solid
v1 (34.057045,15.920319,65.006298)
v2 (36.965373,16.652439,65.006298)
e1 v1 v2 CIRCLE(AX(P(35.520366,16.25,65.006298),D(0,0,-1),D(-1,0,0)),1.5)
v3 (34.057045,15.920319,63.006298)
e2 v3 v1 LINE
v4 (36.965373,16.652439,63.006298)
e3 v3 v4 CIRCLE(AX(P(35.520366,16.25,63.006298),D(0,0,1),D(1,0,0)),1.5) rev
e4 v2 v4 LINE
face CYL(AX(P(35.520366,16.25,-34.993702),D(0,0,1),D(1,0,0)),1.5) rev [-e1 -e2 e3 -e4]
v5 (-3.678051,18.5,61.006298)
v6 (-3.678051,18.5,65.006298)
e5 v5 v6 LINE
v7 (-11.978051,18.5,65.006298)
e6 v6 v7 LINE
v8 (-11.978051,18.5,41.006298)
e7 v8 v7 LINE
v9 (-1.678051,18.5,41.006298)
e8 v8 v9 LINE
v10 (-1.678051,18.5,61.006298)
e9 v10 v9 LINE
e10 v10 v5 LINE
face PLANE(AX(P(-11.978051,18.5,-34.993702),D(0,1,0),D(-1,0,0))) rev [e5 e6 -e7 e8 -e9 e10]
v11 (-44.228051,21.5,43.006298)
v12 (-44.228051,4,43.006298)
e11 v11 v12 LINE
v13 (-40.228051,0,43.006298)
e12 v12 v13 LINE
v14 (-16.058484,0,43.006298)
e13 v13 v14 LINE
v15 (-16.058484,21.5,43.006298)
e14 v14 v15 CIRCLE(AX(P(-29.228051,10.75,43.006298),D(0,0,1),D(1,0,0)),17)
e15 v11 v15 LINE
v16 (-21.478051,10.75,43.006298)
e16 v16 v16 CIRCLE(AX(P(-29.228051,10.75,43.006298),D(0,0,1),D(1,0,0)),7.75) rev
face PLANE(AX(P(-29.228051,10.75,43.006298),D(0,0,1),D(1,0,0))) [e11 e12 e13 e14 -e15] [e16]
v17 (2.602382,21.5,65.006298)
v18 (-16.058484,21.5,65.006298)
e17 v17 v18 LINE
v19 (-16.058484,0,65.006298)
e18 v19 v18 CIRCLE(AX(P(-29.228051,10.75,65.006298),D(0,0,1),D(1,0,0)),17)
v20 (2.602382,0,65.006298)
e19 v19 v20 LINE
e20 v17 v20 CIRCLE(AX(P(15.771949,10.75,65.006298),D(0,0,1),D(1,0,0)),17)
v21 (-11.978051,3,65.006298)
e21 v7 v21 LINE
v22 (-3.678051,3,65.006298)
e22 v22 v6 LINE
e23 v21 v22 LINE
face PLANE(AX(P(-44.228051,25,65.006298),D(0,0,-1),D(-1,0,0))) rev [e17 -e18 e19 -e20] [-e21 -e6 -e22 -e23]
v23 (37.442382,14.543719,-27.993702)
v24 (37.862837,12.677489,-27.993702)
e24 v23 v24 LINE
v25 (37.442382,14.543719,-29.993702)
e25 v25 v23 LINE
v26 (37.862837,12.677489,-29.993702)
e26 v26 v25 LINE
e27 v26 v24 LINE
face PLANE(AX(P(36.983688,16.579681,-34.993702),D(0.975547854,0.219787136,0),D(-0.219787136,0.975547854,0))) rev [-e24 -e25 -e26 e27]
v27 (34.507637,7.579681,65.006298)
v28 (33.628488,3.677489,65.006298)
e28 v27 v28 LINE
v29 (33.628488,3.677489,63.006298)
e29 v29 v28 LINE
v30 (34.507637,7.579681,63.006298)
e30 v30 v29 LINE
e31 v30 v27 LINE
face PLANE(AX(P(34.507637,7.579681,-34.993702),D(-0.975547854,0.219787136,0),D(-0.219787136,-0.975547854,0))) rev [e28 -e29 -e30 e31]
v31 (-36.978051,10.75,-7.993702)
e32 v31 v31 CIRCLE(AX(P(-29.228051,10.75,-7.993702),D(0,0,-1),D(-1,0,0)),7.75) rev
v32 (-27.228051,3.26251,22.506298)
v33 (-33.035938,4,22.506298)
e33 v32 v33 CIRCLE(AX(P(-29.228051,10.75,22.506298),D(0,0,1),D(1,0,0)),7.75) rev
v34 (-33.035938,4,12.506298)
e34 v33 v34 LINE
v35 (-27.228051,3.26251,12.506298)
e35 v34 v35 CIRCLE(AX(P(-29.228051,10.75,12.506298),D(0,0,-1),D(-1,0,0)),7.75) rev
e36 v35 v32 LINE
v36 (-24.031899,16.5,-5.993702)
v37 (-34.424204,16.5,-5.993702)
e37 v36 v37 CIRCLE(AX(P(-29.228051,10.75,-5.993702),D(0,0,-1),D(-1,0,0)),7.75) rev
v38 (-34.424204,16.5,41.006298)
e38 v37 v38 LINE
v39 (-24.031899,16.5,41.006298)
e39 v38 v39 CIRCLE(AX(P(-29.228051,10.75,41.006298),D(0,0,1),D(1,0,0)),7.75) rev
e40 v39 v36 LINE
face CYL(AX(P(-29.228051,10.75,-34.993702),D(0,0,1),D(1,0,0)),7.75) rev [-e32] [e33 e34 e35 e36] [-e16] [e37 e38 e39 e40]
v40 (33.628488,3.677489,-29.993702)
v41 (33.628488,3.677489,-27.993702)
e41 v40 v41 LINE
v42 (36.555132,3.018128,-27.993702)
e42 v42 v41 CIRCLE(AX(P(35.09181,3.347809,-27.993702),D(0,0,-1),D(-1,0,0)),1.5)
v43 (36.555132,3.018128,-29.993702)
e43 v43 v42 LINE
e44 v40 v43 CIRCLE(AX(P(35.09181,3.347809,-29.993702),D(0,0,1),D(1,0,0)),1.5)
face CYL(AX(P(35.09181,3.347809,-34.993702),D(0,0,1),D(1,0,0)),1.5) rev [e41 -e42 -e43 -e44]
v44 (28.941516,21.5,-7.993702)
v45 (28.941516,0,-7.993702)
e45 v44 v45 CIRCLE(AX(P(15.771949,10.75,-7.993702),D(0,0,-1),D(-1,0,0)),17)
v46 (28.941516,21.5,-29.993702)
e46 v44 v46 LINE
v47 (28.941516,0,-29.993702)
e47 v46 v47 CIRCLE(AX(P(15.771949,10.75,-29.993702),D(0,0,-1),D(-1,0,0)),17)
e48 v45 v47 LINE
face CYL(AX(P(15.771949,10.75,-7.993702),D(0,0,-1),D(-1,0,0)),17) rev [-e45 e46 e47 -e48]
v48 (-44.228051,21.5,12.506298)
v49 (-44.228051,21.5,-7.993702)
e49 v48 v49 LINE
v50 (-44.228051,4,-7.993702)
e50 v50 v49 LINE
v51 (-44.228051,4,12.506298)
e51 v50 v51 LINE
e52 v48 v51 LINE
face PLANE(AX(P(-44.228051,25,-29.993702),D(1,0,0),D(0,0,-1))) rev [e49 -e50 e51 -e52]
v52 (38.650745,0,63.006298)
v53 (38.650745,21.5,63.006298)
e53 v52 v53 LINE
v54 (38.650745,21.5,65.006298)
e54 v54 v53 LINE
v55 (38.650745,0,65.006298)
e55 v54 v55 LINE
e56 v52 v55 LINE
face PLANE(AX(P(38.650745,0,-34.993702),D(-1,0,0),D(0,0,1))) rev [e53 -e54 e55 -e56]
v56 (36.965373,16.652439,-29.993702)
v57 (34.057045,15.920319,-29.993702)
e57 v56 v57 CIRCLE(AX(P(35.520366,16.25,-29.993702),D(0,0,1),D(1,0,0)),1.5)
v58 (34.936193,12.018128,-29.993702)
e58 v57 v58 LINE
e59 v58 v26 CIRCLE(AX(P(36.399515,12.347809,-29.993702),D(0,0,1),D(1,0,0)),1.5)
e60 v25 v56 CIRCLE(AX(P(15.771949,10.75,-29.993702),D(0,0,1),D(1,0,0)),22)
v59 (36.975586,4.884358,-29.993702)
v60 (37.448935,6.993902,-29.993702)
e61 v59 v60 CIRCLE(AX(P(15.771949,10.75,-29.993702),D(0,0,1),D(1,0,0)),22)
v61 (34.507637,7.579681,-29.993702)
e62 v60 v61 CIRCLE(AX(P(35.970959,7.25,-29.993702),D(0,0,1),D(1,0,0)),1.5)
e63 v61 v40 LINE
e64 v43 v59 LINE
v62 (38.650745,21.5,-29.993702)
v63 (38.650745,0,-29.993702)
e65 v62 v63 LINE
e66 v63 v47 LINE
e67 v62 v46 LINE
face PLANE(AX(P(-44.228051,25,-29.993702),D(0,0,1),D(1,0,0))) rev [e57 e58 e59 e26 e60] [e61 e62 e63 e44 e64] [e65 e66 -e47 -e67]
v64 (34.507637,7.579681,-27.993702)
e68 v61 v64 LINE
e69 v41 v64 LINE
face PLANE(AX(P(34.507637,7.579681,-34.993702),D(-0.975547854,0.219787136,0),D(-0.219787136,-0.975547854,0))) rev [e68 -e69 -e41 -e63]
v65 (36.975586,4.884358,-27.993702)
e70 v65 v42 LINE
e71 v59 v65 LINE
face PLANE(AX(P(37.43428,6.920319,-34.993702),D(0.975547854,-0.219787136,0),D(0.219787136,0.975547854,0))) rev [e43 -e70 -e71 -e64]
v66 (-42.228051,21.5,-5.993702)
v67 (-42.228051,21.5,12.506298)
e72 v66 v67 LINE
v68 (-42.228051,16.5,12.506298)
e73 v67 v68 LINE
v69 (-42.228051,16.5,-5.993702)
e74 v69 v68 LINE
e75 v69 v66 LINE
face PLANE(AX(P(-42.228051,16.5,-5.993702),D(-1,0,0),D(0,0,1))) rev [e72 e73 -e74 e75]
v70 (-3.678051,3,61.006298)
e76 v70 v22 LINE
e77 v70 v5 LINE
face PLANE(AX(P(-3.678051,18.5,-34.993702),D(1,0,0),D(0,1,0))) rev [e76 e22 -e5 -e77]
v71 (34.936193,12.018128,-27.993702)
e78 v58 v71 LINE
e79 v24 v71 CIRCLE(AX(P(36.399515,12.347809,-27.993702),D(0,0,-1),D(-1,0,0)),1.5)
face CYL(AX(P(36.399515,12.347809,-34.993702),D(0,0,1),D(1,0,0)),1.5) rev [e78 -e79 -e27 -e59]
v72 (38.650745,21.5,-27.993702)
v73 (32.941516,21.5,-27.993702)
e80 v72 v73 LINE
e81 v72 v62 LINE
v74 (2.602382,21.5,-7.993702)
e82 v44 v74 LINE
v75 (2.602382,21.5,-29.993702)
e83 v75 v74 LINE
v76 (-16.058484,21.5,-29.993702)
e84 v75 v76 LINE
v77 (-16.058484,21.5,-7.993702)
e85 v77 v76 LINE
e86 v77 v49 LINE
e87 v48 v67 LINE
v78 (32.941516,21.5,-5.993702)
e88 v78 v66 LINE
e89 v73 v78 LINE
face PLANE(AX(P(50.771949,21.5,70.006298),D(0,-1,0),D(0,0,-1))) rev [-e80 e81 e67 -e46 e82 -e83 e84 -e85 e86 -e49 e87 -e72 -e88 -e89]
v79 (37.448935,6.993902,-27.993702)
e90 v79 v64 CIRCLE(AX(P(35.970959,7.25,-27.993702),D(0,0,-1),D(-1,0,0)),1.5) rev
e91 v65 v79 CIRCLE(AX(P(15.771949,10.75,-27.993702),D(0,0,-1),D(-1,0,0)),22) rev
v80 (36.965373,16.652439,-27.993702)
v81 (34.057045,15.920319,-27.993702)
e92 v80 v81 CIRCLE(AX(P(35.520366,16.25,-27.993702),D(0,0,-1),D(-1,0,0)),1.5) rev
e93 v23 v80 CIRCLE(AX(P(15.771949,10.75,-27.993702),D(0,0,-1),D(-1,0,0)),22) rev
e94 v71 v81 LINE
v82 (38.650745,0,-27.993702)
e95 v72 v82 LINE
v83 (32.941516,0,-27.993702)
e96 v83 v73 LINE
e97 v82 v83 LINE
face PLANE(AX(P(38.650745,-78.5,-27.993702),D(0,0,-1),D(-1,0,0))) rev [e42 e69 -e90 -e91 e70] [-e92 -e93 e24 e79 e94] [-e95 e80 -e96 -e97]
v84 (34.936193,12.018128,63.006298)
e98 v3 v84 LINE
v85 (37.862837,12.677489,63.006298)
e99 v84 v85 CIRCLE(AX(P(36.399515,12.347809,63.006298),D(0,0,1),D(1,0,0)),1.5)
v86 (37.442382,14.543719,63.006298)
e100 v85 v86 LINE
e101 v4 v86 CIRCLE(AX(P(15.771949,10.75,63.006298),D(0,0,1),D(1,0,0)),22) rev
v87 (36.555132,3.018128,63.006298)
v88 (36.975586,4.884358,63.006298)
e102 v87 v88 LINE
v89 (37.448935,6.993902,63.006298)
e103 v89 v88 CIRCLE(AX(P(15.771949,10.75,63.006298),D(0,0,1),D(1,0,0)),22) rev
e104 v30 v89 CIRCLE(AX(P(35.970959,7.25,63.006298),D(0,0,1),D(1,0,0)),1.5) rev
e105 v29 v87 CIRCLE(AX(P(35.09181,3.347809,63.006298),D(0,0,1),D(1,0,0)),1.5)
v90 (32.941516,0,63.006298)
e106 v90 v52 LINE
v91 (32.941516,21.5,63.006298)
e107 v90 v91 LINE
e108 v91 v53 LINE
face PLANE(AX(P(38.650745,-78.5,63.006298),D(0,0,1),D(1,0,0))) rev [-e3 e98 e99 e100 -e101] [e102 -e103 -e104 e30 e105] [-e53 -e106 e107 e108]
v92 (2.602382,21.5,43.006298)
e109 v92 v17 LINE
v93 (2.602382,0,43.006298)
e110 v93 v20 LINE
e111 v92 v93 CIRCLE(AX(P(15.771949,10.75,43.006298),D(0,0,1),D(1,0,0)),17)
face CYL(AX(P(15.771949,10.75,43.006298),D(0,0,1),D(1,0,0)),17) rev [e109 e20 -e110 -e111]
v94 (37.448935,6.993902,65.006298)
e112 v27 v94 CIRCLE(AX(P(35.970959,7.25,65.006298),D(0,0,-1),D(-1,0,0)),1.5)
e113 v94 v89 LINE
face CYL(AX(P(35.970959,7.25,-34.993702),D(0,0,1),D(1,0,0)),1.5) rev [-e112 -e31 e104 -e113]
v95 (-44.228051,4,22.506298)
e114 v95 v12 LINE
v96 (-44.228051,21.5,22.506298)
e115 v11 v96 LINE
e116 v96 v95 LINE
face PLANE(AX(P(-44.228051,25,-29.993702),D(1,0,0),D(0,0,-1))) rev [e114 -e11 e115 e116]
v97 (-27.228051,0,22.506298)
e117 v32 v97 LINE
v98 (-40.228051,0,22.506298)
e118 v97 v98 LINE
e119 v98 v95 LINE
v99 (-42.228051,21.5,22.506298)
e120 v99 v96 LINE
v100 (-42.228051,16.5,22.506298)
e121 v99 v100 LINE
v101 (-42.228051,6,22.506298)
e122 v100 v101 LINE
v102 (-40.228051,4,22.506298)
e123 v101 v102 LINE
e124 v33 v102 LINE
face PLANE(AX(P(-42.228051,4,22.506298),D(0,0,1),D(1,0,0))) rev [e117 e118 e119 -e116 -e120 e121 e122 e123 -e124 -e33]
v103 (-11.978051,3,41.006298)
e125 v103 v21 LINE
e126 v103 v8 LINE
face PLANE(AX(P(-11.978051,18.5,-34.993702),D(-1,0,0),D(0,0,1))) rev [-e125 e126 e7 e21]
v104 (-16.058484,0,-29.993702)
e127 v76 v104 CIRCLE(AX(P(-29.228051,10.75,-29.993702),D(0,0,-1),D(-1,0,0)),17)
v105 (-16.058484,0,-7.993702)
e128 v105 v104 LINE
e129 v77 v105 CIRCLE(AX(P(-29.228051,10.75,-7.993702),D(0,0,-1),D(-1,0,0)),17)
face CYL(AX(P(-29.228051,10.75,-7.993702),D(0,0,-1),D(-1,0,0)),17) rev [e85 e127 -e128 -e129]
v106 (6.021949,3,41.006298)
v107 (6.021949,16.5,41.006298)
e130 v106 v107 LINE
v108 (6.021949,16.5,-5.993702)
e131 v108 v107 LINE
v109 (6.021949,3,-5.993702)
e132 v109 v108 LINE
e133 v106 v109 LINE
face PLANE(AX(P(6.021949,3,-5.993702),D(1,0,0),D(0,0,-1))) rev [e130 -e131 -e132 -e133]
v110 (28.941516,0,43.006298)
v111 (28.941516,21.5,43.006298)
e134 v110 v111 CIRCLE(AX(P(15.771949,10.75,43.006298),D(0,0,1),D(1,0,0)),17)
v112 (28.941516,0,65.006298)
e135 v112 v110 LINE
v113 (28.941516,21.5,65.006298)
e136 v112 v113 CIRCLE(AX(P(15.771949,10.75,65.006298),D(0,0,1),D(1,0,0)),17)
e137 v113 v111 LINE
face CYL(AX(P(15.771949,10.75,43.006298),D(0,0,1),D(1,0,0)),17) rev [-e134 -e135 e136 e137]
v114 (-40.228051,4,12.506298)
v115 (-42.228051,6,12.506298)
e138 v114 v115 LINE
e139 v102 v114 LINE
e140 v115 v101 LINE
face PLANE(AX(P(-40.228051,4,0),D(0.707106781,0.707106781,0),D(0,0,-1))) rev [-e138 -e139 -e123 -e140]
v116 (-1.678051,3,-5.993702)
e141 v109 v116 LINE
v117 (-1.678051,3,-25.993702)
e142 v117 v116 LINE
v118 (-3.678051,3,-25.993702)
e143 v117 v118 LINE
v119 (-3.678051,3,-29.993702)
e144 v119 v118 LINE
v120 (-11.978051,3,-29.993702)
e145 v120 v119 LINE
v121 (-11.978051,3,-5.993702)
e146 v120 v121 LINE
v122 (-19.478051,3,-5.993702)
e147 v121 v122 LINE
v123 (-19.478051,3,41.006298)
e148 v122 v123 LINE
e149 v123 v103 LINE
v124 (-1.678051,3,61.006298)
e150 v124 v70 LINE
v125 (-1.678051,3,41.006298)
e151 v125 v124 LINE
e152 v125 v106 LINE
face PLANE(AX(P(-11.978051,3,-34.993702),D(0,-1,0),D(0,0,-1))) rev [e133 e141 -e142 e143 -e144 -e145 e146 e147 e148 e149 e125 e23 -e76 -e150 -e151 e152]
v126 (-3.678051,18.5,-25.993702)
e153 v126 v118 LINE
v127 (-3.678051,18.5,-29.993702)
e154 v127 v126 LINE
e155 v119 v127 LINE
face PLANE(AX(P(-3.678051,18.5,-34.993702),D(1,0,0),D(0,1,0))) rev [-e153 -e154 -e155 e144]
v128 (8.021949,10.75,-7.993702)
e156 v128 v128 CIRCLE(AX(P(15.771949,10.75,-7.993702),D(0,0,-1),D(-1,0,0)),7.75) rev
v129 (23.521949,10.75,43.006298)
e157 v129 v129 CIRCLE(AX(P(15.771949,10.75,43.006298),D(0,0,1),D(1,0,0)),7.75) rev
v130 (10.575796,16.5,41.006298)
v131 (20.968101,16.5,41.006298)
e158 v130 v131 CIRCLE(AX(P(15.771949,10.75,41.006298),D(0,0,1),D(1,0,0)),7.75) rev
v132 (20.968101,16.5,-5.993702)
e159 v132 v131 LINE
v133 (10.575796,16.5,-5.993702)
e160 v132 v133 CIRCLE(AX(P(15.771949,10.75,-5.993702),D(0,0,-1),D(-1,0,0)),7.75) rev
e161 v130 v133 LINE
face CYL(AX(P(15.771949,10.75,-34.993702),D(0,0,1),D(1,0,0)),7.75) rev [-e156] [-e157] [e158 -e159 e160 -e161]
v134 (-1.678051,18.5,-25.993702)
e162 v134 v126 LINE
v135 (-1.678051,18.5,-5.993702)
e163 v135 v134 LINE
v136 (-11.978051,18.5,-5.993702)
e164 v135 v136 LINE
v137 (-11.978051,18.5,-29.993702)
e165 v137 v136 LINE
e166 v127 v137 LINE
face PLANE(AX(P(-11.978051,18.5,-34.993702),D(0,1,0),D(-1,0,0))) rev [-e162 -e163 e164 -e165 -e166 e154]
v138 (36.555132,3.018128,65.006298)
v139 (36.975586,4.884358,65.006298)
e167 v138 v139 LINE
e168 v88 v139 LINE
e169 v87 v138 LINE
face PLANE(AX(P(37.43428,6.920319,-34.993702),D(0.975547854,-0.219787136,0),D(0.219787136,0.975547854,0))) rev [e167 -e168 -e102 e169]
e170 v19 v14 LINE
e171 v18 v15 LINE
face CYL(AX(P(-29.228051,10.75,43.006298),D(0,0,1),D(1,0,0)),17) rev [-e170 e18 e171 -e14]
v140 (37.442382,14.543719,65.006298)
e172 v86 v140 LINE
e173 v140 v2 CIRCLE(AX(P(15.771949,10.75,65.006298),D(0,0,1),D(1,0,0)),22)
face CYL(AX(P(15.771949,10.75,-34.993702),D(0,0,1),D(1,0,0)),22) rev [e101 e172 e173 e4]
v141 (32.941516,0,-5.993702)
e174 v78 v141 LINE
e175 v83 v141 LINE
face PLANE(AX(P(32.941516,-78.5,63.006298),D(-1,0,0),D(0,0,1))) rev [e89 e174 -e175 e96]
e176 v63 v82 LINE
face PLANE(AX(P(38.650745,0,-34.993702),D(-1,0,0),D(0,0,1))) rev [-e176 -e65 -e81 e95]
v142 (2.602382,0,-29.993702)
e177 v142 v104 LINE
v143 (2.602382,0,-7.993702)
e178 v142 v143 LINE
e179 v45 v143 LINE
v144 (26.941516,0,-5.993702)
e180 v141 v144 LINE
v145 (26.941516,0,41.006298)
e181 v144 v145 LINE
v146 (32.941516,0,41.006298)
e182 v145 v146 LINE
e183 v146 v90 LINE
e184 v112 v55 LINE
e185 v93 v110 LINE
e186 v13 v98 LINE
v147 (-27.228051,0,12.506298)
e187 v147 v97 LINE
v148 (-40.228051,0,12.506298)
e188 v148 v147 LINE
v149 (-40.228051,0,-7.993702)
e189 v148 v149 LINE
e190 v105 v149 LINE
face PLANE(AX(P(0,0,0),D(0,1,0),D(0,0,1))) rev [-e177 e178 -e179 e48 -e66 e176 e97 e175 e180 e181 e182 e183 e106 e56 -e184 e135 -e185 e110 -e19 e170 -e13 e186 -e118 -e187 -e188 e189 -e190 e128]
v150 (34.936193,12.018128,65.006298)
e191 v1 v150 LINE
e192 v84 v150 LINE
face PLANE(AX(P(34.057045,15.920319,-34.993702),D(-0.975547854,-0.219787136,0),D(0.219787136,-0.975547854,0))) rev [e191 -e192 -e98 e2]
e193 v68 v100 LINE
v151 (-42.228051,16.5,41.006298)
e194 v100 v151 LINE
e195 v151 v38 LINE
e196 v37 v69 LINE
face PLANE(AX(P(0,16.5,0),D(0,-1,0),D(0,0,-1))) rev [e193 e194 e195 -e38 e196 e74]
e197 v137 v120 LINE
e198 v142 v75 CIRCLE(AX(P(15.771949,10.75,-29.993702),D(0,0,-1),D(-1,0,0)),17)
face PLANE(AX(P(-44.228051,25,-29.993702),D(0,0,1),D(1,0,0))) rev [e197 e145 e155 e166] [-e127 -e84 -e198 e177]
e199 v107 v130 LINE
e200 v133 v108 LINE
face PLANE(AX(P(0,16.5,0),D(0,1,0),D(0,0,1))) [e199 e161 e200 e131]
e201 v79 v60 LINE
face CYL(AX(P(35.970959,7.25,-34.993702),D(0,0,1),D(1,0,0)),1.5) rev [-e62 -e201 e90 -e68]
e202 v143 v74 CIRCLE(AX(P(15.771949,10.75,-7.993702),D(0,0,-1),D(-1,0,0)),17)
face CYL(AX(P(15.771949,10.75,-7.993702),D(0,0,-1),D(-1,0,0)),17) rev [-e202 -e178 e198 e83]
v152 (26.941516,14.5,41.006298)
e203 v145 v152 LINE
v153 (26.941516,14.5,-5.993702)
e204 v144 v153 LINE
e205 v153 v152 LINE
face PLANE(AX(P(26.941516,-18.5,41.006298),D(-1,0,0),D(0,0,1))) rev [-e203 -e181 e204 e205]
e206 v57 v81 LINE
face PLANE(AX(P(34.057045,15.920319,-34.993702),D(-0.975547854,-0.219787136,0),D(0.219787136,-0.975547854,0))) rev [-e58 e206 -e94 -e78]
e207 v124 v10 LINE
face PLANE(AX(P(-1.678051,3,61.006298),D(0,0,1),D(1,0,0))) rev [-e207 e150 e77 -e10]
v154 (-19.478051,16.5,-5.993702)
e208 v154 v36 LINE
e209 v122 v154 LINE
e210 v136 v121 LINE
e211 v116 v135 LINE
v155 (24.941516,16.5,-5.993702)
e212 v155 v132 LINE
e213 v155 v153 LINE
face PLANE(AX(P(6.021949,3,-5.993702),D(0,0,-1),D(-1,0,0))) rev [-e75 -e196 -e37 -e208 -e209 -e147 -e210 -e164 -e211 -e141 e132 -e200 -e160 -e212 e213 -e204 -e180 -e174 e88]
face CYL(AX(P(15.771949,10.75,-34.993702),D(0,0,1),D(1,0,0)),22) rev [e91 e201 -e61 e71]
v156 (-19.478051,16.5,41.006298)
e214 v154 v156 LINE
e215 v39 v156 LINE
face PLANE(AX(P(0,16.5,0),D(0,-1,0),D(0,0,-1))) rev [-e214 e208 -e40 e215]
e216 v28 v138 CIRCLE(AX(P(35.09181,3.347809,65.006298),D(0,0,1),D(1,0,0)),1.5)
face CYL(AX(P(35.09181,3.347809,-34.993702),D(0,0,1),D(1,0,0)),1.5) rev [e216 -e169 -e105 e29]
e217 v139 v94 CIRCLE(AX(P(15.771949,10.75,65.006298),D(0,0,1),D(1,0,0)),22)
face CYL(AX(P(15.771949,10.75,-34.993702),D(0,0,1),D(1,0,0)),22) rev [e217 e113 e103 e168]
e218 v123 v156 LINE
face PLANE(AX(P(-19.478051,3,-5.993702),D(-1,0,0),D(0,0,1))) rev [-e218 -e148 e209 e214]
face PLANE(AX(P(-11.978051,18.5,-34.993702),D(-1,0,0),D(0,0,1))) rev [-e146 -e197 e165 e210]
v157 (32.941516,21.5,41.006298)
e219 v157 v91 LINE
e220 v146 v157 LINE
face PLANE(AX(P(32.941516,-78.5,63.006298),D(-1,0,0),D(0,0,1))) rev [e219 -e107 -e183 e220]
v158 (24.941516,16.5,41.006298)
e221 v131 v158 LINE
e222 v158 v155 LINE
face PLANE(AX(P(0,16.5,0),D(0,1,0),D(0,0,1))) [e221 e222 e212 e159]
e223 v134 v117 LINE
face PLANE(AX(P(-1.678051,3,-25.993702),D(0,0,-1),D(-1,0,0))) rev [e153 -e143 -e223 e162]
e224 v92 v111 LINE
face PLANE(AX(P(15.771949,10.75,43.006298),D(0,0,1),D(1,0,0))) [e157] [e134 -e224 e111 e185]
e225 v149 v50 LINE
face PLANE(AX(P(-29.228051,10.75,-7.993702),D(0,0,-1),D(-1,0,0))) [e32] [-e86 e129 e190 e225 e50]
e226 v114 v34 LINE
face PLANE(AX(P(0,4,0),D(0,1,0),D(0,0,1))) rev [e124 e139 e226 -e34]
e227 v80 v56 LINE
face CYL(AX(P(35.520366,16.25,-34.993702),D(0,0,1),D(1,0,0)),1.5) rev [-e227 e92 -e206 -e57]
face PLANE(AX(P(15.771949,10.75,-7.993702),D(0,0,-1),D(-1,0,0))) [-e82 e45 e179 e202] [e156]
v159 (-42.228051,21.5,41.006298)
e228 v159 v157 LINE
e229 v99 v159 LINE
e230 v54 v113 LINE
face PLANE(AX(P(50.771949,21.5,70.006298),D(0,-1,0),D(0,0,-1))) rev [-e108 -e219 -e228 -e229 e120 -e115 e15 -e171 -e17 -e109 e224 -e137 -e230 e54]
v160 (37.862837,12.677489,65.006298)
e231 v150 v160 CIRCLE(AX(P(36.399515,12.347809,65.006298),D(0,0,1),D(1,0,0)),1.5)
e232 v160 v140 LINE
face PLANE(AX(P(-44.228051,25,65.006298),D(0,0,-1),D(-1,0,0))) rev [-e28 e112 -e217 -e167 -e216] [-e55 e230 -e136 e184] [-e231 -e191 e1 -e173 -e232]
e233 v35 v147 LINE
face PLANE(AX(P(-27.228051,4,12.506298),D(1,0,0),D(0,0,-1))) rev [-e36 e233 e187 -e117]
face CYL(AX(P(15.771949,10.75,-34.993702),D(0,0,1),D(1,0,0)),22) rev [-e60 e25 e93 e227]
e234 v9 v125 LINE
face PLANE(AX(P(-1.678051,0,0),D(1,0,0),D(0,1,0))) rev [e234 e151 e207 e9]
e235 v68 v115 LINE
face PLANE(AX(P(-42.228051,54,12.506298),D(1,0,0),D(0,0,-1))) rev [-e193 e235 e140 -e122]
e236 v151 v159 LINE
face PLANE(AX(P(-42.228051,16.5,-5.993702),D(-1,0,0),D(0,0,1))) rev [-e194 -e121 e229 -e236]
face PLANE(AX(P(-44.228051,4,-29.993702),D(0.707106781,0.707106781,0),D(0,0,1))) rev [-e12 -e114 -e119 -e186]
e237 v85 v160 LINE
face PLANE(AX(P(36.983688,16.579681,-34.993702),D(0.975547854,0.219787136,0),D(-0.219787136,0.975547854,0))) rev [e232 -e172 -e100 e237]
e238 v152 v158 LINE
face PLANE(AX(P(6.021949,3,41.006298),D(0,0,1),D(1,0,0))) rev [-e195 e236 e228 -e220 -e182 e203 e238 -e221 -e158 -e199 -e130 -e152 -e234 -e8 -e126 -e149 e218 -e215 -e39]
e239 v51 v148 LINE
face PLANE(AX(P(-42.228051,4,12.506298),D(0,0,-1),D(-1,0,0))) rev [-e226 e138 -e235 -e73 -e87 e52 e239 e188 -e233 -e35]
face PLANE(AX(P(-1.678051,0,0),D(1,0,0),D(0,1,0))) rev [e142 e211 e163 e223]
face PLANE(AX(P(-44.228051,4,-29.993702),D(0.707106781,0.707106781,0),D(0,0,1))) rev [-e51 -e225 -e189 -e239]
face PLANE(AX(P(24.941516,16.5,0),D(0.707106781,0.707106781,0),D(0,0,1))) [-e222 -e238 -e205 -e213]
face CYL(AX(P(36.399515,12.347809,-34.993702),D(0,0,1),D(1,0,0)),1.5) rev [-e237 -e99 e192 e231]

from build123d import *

# Parameters (mm, degrees)
SKETCH1_W           = 95
SKETCH1_H           = 95
BOSS_EXTRUDE1_DEPTH = 25
SKETCH2_R           = 7.75
CUT_EXTRUDE2_DEPTH  = 100
SKETCH3_R           = 17
CUT_EXTRUDE3_DEPTH  = 22
CUT_EXTRUDE4_START  = -22
SKETCH4_R           = 17
CUT_EXTRUDE4_DEPTH  = 22
SKETCH5_W           = 6.246993927
SKETCH5_H           = 25
CUT_EXTRUDE5_DEPTH  = 22
SKETCH6_W           = 7.178723585
SKETCH6_H           = 25
CUT_EXTRUDE6_DEPTH  = 22
SKETCH8_W           = 99.503929421
SKETCH8_H           = 3.5
CUT_EXTRUDE7_DEPTH  = 100
SKETCH9_W           = 8.3
SKETCH9_H           = 15.5
CUT_EXTRUDE11_DEPTH = 100
SKETCH13_W          = 87
SKETCH13_H          = 15.5
CUT_EXTRUDE12_DEPTH = 2
SKETCH14_W          = 25.5
SKETCH14_H          = 47
CUT_EXTRUDE14_DEPTH = 18.5
SKETCH16_W          = 24.75
SKETCH16_H          = 47
CUT_EXTRUDE15_DEPTH = 5
SKETCH17_W          = 20.919567191
SKETCH17_H          = 47
CUT_EXTRUDE16_DEPTH = 5
CUT_EXTRUDE17_DEPTH = 100
FILLET6_R           = 1.5
FILLET7_R           = 1.5
FILLET8_R           = 1.5
FILLET9_R           = 1.5
SKETCH19_W          = 12.12120401
SKETCH19_H          = 21.5
CUT_EXTRUDE20_DEPTH = 100
SKETCH20_W          = 5.709228799
SKETCH20_H          = 91
CUT_EXTRUDE23_DEPTH = 100
SKETCH21_W          = 6
SKETCH21_H          = 47
CUT_EXTRUDE26_DEPTH = 40
CHAMFER1_SIZE       = 2
SKETCH22_W          = 15
SKETCH22_H          = 10
CUT_EXTRUDE27_DEPTH = 4
SKETCH23_W          = 2
SKETCH23_H          = 10
CUT_EXTRUDE28_DEPTH = 54
CHAMFER2_SIZE       = 2
CHAMFER3_SIZE       = 4
CHAMFER4_SIZE       = 4
CUT_EXTRUDE29_DEPTH = 100


with BuildPart() as part:
    # Sketch1 → Boss-Extrude1 (new body)
    with BuildSketch(Plane(origin=(0, 0, 0), x_dir=(1, 0, 0), z_dir=(0, 1, 0))):
        with Locations((3.271948822, -17.506298191)):
            Rectangle(SKETCH1_W, SKETCH1_H)
    extrude(amount=BOSS_EXTRUDE1_DEPTH)

    # Sketch2 → Cut-Extrude2 (cut)
    with BuildSketch(Plane.XY.offset(65.006298191)):
        with Locations((-29.228051178, 10.75)):
            Circle(SKETCH2_R)
        with Locations((15.771948822, 10.75)):
            Circle(SKETCH2_R)
    extrude(amount=-CUT_EXTRUDE2_DEPTH, mode=Mode.SUBTRACT)

    # Sketch3 → Cut-Extrude3 (cut)
    with BuildSketch(Plane.XY.offset(65.006298191)):
        with Locations((-29.228051178, 10.75)):
            Circle(SKETCH3_R)
        with Locations((15.771948822, 10.75)):
            Circle(SKETCH3_R)
    extrude(amount=-CUT_EXTRUDE3_DEPTH, mode=Mode.SUBTRACT)

    # Sketch4 → Cut-Extrude4 (cut)
    with BuildSketch(Plane(origin=(0, 0, -29.993701809), x_dir=(-1, 0, 0), z_dir=(0, 0, -1)).offset(CUT_EXTRUDE4_START)):
        with Locations((-15.771948822, 10.75)):
            Circle(SKETCH4_R)
        with Locations((29.228051178, 10.75)):
            Circle(SKETCH4_R)
    extrude(amount=CUT_EXTRUDE4_DEPTH, mode=Mode.SUBTRACT)

    # Sketch5 → Cut-Extrude5 (cut)
    with BuildSketch(Plane.XY.offset(65.006298191)):
        with Locations((-41.104554214, 12.5)):
            Rectangle(SKETCH5_W, SKETCH5_H)
    extrude(amount=-CUT_EXTRUDE5_DEPTH, mode=Mode.SUBTRACT)

    # Sketch6 → Cut-Extrude6 (cut)
    with BuildSketch(Plane(origin=(0, 0, -29.993701809), x_dir=(-1, 0, 0), z_dir=(0, 0, -1))):
        with Locations((40.638689386, 12.5)):
            Rectangle(SKETCH6_W, SKETCH6_H)
    extrude(amount=-CUT_EXTRUDE6_DEPTH, mode=Mode.SUBTRACT)

    # Sketch8 → Cut-Extrude7 (cut)
    with BuildSketch(Plane(origin=(0, 0, -29.993701809), x_dir=(-1, 0, 0), z_dir=(0, 0, -1))):
        with Locations((-1.019984112, 23.25)):
            Rectangle(SKETCH8_W, SKETCH8_H)
    extrude(amount=-CUT_EXTRUDE7_DEPTH, mode=Mode.SUBTRACT)

    # Sketch9 → Cut-Extrude11 (cut)
    with BuildSketch(Plane.XY.offset(65.006298191)):
        with Locations((-7.828051178, 10.75)):
            Rectangle(SKETCH9_W, SKETCH9_H)
    extrude(amount=-CUT_EXTRUDE11_DEPTH, mode=Mode.SUBTRACT)

    # Sketch13 → Cut-Extrude12 (cut)
    with BuildSketch(Plane.ZY.offset(3.678051178)):
        with Locations((17.506298191, 10.75)):
            Rectangle(SKETCH13_W, SKETCH13_H)
    extrude(amount=-CUT_EXTRUDE12_DEPTH, mode=Mode.SUBTRACT)

    # Sketch14 → Cut-Extrude14 (cut)
    with BuildSketch(Plane(origin=(0, 21.5, 0), x_dir=(1, 0, 0), z_dir=(0, 1, 0))):
        with Locations((-6.728051178, -17.506298191)):
            Rectangle(SKETCH14_W, SKETCH14_H)
    extrude(amount=-CUT_EXTRUDE14_DEPTH, mode=Mode.SUBTRACT)

    # Sketch16 → Cut-Extrude15 (cut)
    with BuildSketch(Plane(origin=(0, 21.5, 0), x_dir=(1, 0, 0), z_dir=(0, 1, 0))):
        with Locations((-29.853051178, -17.506298191)):
            Rectangle(SKETCH16_W, SKETCH16_H)
    extrude(amount=-CUT_EXTRUDE15_DEPTH, mode=Mode.SUBTRACT)

    # Sketch17 → Cut-Extrude16 (cut)
    with BuildSketch(Plane(origin=(0, 21.5, 0), x_dir=(1, 0, 0), z_dir=(0, 1, 0))):
        with Locations((16.481732418, -17.506298191)):
            Rectangle(SKETCH17_W, SKETCH17_H)
    extrude(amount=-CUT_EXTRUDE16_DEPTH, mode=Mode.SUBTRACT)

    # Sketch18 → Cut-Extrude17 (cut)
    with BuildSketch(Plane.XY.offset(65.006298191)):
        with BuildLine():
            Line((34.66639245, 12.75), (37.680851122, 12.75))
            ThreePointArc((37.680851122, 12.75), (37.300376381, 15.28065192), (36.628602437, 17.75))
            Line((36.628602437, 17.75), (33.435470555, 17.75))
            ThreePointArc((33.435470555, 17.75), (34.221100776, 15.291893017), (34.66639245, 12.75))
        make_face()
        with BuildLine():
            Line((34.66639245, 8.75), (37.680851122, 8.75))
            ThreePointArc((37.680851122, 8.75), (37.300376381, 6.21934808), (36.628602437, 3.75))
            Line((36.628602437, 3.75), (33.435470555, 3.75))
            ThreePointArc((33.435470555, 3.75), (34.221100776, 6.208106983), (34.66639245, 8.75))
        make_face()
    extrude(amount=-CUT_EXTRUDE17_DEPTH, mode=Mode.SUBTRACT)

    # Fillet6
    fillet6_edges = [part.edges().sort_by_distance(p)[0] for p in [
        (33.435470555, 17.75, 17.506298191),
        (36.628602437, 17.75, 17.506298191),
    ]]
    fillet(fillet6_edges, radius=FILLET6_R - 0.0001)  # a hair under: the kernel refuses the full size

    # Fillet7
    fillet7_edges = [part.edges().sort_by_distance(p)[0] for p in [
        (37.680851122, 12.75, 17.506298191),
        (34.66639245, 12.75, 17.506298191),
    ]]
    fillet(fillet7_edges, radius=FILLET7_R - 0.0001)  # a hair under: the kernel refuses the full size

    # Fillet8
    fillet8_edges = [part.edges().sort_by_distance(p)[0] for p in [
        (33.435470555, 3.75, 17.506298191),
        (36.628602437, 3.75, 17.506298191),
    ]]
    fillet(fillet8_edges, radius=FILLET8_R - 0.0001)  # a hair under: the kernel refuses the full size

    # Fillet9
    fillet9_edges = [part.edges().sort_by_distance(p)[0] for p in [
        (37.680851122, 8.75, 17.506298191),
        (34.66639245, 8.75, 17.506298191),
    ]]
    fillet(fillet9_edges, radius=FILLET9_R - 0.0001)  # a hair under: the kernel refuses the full size

    # Sketch19 → Cut-Extrude20 (cut)
    with BuildSketch(Plane.XY.offset(65.006298191)):
        with Locations((44.711346817, 10.75)):
            Rectangle(SKETCH19_W, SKETCH19_H)
    extrude(amount=-CUT_EXTRUDE20_DEPTH, mode=Mode.SUBTRACT)

    # Sketch20 → Cut-Extrude23 (cut)
    with BuildSketch(Plane(origin=(0, 21.5, 0), x_dir=(1, 0, 0), z_dir=(0, 1, 0))):
        with Locations((35.796130413, -17.506298191)):
            Rectangle(SKETCH20_W, SKETCH20_H)
    extrude(amount=-CUT_EXTRUDE23_DEPTH, mode=Mode.SUBTRACT)

    # Sketch21 → Cut-Extrude26 (cut)
    with BuildSketch(Plane(origin=(0, 21.5, 0), x_dir=(1, 0, 0), z_dir=(0, 1, 0))):
        with Locations((29.941516013, -17.506298191)):
            Rectangle(SKETCH21_W, SKETCH21_H)
    extrude(amount=-CUT_EXTRUDE26_DEPTH, mode=Mode.SUBTRACT)

    # Chamfer1
    chamfer1_edges = [part.edges().sort_by_distance(p)[0] for p in [
        (26.941516013, 16.5, 17.506298191),
    ]]
    chamfer(chamfer1_edges, length=CHAMFER1_SIZE)

    # Sketch22 → Cut-Extrude27 (cut)
    with BuildSketch(Plane(origin=(0, 0, 0), x_dir=(-1, 0, 0), z_dir=(0, -1, 0))):
        with Locations((34.728051178, -17.506298191)):
            Rectangle(SKETCH22_W, SKETCH22_H)
    extrude(amount=-CUT_EXTRUDE27_DEPTH, mode=Mode.SUBTRACT)

    # Sketch23 → Cut-Extrude28 (cut)
    with BuildSketch(Plane(origin=(0, 0, 0), x_dir=(-1, 0, 0), z_dir=(0, -1, 0))):
        with Locations((43.228051178, -17.506298191)):
            Rectangle(SKETCH23_W, SKETCH23_H)
    extrude(amount=-CUT_EXTRUDE28_DEPTH, mode=Mode.SUBTRACT)

    # Chamfer2
    chamfer2_edges = [part.edges().sort_by_distance(p)[0] for p in [
        (-42.228051178, 4, 17.506298191),
    ]]
    chamfer(chamfer2_edges, length=CHAMFER2_SIZE)

    # Chamfer3
    chamfer3_edges = [part.edges().sort_by_distance(p)[0] for p in [
        (-44.228051178, 0, 2.256298191),
    ]]
    chamfer(chamfer3_edges, length=CHAMFER3_SIZE)

    # Chamfer4
    chamfer4_edges = [part.edges().sort_by_distance(p)[0] for p in [
        (-44.228051178, 0, 32.756298191),
    ]]
    chamfer(chamfer4_edges, length=CHAMFER4_SIZE)

    # Sketch24 → Cut-Extrude29 (cut)
    with BuildSketch(Plane.XY.offset(65.006298191)):
        with BuildLine():
            Line((36.983688261, 16.579680704), (37.862836804, 12.677489289))
            ThreePointArc((37.862836804, 12.677489289), (36.729195727, 10.884486805), (34.936193243, 12.018127881))
            Line((34.936193243, 12.018127881), (34.0570447, 15.920319296))
            ThreePointArc((34.0570447, 15.920319296), (35.190685776, 17.713321781), (36.983688261, 16.579680704))
        make_face()
        with BuildLine():
            Line((37.434280479, 6.920319296), (36.555131936, 3.018127881))
            ThreePointArc((36.555131936, 3.018127881), (34.762129451, 1.884486805), (33.628488375, 3.677489289))
            Line((33.628488375, 3.677489289), (34.507636918, 7.579680704))
            ThreePointArc((34.507636918, 7.579680704), (36.300639403, 8.713321781), (37.434280479, 6.920319296))
        make_face()
    extrude(amount=-CUT_EXTRUDE29_DEPTH, mode=Mode.SUBTRACT)


solid = part.part
